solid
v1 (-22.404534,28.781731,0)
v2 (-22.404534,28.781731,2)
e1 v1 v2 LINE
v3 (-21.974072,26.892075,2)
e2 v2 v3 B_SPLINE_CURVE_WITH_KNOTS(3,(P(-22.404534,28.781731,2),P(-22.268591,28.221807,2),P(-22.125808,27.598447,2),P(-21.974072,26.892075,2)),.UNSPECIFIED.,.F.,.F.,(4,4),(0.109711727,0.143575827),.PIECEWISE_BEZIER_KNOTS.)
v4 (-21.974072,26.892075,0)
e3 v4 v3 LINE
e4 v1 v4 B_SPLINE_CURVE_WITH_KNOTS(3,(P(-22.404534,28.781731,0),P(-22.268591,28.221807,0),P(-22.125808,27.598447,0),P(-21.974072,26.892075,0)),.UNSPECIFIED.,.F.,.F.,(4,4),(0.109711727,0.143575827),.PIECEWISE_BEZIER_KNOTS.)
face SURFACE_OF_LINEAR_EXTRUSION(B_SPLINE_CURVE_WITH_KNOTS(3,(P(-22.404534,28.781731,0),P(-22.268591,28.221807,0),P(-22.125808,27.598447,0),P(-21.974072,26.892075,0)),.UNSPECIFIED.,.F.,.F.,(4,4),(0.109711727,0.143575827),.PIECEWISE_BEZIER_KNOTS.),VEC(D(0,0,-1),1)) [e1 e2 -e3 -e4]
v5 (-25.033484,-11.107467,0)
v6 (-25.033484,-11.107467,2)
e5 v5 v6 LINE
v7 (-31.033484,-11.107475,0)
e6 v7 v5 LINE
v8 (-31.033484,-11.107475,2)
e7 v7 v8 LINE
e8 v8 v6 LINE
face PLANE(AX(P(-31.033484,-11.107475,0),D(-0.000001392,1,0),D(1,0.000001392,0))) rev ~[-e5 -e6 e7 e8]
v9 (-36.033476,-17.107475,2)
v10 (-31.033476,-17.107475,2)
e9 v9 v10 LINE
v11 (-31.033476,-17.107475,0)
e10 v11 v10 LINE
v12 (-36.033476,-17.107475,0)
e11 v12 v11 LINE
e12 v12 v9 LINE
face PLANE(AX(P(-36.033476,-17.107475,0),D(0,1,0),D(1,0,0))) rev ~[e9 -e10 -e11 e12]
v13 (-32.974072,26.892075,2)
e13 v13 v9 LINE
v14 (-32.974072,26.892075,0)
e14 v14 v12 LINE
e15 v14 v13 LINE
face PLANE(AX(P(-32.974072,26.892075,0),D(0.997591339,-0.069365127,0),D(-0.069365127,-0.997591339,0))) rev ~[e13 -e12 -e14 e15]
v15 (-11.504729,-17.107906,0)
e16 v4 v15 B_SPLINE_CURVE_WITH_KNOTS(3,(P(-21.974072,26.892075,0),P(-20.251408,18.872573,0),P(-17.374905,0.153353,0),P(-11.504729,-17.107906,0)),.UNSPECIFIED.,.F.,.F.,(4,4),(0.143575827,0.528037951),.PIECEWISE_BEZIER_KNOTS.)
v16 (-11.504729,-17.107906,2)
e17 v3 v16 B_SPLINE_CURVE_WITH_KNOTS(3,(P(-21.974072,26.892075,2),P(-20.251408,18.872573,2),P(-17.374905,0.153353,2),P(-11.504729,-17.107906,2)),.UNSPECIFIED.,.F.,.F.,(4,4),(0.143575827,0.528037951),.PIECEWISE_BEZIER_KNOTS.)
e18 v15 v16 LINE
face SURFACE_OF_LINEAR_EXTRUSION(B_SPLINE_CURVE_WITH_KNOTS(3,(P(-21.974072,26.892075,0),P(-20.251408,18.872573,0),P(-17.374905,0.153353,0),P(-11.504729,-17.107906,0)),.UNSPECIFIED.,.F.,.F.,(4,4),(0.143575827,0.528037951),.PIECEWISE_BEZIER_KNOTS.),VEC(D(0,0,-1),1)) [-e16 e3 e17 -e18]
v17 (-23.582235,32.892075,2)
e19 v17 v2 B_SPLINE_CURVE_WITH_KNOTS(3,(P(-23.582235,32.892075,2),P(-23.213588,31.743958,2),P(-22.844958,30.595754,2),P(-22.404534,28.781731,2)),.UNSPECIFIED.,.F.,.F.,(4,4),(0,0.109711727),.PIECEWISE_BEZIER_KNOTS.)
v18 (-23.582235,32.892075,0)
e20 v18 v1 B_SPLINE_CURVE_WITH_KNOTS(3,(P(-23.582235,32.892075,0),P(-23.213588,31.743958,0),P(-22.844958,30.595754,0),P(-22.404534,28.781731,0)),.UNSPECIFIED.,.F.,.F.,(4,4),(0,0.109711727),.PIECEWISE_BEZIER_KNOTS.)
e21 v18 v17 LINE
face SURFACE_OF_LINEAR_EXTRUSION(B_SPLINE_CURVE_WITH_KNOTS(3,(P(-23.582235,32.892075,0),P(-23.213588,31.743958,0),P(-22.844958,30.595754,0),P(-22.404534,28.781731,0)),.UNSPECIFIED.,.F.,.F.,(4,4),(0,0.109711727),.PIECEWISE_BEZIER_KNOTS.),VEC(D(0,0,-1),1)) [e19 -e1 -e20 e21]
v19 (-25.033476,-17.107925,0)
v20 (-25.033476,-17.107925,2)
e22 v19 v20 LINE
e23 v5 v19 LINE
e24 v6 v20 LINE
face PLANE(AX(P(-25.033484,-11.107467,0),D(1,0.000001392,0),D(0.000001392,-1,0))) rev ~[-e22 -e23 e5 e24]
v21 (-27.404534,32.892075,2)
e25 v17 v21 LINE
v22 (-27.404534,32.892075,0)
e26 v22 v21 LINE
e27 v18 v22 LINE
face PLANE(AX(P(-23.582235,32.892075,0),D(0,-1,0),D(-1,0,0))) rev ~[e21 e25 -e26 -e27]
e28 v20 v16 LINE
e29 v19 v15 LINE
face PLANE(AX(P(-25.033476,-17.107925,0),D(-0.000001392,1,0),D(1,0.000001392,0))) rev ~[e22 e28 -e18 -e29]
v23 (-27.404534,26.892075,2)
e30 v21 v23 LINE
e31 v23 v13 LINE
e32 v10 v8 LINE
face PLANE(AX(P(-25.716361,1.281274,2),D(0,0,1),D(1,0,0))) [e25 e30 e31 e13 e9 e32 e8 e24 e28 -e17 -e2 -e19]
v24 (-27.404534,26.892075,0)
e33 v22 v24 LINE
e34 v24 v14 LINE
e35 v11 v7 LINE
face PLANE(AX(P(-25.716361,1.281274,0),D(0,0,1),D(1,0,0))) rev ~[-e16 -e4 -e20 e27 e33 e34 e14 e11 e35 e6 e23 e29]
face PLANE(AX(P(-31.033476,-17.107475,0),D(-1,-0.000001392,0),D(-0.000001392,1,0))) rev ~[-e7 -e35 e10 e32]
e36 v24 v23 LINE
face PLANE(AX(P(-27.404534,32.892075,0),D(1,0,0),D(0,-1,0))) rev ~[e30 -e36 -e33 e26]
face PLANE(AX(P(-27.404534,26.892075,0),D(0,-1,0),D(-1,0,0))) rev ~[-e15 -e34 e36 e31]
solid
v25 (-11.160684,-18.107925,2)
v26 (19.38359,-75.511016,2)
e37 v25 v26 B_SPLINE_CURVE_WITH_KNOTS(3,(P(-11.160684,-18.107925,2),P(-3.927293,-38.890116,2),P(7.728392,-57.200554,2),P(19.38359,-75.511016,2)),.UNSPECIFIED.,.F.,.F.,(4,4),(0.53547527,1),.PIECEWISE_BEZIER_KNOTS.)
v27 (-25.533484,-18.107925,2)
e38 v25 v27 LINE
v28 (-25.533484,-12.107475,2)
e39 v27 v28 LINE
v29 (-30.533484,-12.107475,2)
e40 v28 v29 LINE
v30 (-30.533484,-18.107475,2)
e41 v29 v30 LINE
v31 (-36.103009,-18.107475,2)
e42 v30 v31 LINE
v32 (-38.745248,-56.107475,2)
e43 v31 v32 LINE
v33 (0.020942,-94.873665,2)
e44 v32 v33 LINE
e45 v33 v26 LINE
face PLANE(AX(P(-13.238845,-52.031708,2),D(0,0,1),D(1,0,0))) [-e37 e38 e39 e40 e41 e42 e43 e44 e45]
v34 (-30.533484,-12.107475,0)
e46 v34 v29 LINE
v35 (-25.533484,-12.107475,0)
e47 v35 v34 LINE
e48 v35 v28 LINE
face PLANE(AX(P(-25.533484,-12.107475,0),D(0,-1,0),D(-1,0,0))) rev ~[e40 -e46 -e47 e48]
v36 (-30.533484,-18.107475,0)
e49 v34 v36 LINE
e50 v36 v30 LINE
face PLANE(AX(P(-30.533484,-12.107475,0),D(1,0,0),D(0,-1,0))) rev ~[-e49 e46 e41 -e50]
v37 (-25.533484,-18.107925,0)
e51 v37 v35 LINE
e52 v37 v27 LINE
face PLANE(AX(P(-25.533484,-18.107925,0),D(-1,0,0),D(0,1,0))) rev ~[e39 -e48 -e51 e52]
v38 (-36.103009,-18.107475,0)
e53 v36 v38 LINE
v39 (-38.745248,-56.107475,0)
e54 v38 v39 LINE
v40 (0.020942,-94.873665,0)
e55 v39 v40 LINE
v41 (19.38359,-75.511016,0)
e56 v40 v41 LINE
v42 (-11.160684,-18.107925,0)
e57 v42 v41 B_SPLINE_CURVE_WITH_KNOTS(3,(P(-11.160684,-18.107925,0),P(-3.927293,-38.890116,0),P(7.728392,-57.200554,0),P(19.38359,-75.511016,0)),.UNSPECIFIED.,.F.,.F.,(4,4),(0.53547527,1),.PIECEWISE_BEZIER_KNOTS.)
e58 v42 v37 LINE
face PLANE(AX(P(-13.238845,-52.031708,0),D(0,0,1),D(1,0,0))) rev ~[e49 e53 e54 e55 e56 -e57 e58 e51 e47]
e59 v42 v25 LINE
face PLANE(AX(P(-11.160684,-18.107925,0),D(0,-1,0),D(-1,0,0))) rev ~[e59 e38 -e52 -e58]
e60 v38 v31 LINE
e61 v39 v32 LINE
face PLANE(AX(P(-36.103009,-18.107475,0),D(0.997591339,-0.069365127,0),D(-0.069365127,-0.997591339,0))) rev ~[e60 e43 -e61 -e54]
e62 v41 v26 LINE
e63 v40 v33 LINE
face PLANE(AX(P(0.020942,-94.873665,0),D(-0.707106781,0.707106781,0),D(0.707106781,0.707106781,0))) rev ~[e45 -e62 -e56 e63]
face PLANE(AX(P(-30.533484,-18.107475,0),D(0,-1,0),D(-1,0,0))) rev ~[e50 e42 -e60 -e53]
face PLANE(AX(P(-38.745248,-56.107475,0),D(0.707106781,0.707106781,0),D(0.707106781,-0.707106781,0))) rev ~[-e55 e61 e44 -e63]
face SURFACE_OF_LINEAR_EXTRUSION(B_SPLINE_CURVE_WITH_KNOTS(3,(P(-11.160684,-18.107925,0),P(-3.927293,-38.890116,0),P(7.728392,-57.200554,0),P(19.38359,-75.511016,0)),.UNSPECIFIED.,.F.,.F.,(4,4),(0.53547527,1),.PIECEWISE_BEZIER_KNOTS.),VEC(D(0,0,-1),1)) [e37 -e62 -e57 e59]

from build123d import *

# Parameters (mm, degrees)
F1_DEPTH = 2


with BuildPart() as f1:
    # F0 (on Top) → F1 (new body)
    with BuildSketch(Plane.XY):
        with BuildLine():
            Line((-36.1030085053, -18.1074753944), (-38.7452475978, -56.1074753944))
            Line((-38.7452475978, -56.1074753944), (0.0209415142, -94.8736645064))
            Line((0.0209415142, -94.8736645064), (19.383590258, -75.5110157627))
            add(Edge.make_bspline(
                [(-11.1606838182, -18.1079245215), (-3.9272930935, -38.8901161994), (7.7283923455, -57.2005538635), (19.383590258, -75.5110157627)],
                knots=[0.5354752701, 0.5354752701, 0.5354752701, 0.5354752701, 1, 1, 1, 1], degree=3))
            Line((-11.1606838182, -18.1079245215), (-25.5334842512, -18.1079245215))
            Line((-25.5334842512, -18.1079245215), (-25.5334842512, -12.1074753944))
            Line((-25.5334842512, -12.1074753944), (-30.5334842512, -12.1074753944))
            Line((-30.5334842512, -12.1074753944), (-30.5334842512, -18.1074753944))
            Line((-30.5334842512, -18.1074753944), (-36.1030085053, -18.1074753944))
        make_face()
    extrude(amount=F1_DEPTH)


with BuildPart() as f1b:
    # F0 (on Top) → F1, piece 2 (new body)
    with BuildSketch(Plane.XY):
        with BuildLine():
            Line((-25.0334758969, -17.1079245215), (-11.5047290727, -17.1079056856))
            add(Edge.make_bspline(
                [(-21.9740723878, 26.8920754785), (-20.2514084677, 18.872572648), (-17.3749052233, 0.1533534673), (-11.5047290727, -17.1079056856)],
                knots=[0.1435758268, 0.1435758268, 0.1435758268, 0.1435758268, 0.5280379508, 0.5280379508, 0.5280379508, 0.5280379508], degree=3))
            Line((-21.9740723878, 26.8920754785), (-22.404534184, 26.8920754785))
            Line((-22.404534184, 26.8920754785), (-27.404534184, 26.8920754785))
            Line((-27.404534184, 26.8920754785), (-32.9740723878, 26.8920754785))
            Line((-32.9740723878, 26.8920754785), (-36.0334758976, -17.1074753944))
            Line((-36.0334758976, -17.1074753944), (-31.0334758976, -17.1074753944))
            Line((-31.0334758976, -17.1074753944), (-31.0334842512, -11.1074753944))
            Line((-31.0334842512, -11.1074753944), (-25.0334842513, -11.1074670407))
            Line((-25.0334842513, -11.1074670407), (-25.0334758969, -17.1079245215))
        make_face()
        with BuildLine():
            Line((-22.404534184, 26.8920754785), (-21.9740723878, 26.8920754785))
            add(Edge.make_bspline(
                [(-22.404534184, 28.7817309061), (-22.2685909811, 28.2218066684), (-22.1258076558, 27.598447393), (-21.9740723878, 26.8920754785)],
                knots=[0.1097117267, 0.1097117267, 0.1097117267, 0.1097117267, 0.1435758268, 0.1435758268, 0.1435758268, 0.1435758268], degree=3))
            Line((-22.404534184, 28.7817309061), (-22.404534184, 26.8920754785))
        make_face()
        with BuildLine():
            Line((-27.404534184, 26.8920754785), (-22.404534184, 26.8920754785))
            Line((-22.404534184, 26.8920754785), (-22.404534184, 28.7817309061))
            add(Edge.make_bspline(
                [(-23.5822349949, 32.8920754785), (-23.213587795, 31.7439577547), (-22.8449582167, 30.5957538617), (-22.404534184, 28.7817309061)],
                knots=[0, 0, 0, 0, 0.1097117267, 0.1097117267, 0.1097117267, 0.1097117267], degree=3))
            Line((-23.5822349949, 32.8920754785), (-27.404534184, 32.8920754785))
            Line((-27.404534184, 32.8920754785), (-27.404534184, 26.8920754785))
        make_face()
    extrude(amount=F1_DEPTH)


solid = Compound([f1.part, f1b.part])
